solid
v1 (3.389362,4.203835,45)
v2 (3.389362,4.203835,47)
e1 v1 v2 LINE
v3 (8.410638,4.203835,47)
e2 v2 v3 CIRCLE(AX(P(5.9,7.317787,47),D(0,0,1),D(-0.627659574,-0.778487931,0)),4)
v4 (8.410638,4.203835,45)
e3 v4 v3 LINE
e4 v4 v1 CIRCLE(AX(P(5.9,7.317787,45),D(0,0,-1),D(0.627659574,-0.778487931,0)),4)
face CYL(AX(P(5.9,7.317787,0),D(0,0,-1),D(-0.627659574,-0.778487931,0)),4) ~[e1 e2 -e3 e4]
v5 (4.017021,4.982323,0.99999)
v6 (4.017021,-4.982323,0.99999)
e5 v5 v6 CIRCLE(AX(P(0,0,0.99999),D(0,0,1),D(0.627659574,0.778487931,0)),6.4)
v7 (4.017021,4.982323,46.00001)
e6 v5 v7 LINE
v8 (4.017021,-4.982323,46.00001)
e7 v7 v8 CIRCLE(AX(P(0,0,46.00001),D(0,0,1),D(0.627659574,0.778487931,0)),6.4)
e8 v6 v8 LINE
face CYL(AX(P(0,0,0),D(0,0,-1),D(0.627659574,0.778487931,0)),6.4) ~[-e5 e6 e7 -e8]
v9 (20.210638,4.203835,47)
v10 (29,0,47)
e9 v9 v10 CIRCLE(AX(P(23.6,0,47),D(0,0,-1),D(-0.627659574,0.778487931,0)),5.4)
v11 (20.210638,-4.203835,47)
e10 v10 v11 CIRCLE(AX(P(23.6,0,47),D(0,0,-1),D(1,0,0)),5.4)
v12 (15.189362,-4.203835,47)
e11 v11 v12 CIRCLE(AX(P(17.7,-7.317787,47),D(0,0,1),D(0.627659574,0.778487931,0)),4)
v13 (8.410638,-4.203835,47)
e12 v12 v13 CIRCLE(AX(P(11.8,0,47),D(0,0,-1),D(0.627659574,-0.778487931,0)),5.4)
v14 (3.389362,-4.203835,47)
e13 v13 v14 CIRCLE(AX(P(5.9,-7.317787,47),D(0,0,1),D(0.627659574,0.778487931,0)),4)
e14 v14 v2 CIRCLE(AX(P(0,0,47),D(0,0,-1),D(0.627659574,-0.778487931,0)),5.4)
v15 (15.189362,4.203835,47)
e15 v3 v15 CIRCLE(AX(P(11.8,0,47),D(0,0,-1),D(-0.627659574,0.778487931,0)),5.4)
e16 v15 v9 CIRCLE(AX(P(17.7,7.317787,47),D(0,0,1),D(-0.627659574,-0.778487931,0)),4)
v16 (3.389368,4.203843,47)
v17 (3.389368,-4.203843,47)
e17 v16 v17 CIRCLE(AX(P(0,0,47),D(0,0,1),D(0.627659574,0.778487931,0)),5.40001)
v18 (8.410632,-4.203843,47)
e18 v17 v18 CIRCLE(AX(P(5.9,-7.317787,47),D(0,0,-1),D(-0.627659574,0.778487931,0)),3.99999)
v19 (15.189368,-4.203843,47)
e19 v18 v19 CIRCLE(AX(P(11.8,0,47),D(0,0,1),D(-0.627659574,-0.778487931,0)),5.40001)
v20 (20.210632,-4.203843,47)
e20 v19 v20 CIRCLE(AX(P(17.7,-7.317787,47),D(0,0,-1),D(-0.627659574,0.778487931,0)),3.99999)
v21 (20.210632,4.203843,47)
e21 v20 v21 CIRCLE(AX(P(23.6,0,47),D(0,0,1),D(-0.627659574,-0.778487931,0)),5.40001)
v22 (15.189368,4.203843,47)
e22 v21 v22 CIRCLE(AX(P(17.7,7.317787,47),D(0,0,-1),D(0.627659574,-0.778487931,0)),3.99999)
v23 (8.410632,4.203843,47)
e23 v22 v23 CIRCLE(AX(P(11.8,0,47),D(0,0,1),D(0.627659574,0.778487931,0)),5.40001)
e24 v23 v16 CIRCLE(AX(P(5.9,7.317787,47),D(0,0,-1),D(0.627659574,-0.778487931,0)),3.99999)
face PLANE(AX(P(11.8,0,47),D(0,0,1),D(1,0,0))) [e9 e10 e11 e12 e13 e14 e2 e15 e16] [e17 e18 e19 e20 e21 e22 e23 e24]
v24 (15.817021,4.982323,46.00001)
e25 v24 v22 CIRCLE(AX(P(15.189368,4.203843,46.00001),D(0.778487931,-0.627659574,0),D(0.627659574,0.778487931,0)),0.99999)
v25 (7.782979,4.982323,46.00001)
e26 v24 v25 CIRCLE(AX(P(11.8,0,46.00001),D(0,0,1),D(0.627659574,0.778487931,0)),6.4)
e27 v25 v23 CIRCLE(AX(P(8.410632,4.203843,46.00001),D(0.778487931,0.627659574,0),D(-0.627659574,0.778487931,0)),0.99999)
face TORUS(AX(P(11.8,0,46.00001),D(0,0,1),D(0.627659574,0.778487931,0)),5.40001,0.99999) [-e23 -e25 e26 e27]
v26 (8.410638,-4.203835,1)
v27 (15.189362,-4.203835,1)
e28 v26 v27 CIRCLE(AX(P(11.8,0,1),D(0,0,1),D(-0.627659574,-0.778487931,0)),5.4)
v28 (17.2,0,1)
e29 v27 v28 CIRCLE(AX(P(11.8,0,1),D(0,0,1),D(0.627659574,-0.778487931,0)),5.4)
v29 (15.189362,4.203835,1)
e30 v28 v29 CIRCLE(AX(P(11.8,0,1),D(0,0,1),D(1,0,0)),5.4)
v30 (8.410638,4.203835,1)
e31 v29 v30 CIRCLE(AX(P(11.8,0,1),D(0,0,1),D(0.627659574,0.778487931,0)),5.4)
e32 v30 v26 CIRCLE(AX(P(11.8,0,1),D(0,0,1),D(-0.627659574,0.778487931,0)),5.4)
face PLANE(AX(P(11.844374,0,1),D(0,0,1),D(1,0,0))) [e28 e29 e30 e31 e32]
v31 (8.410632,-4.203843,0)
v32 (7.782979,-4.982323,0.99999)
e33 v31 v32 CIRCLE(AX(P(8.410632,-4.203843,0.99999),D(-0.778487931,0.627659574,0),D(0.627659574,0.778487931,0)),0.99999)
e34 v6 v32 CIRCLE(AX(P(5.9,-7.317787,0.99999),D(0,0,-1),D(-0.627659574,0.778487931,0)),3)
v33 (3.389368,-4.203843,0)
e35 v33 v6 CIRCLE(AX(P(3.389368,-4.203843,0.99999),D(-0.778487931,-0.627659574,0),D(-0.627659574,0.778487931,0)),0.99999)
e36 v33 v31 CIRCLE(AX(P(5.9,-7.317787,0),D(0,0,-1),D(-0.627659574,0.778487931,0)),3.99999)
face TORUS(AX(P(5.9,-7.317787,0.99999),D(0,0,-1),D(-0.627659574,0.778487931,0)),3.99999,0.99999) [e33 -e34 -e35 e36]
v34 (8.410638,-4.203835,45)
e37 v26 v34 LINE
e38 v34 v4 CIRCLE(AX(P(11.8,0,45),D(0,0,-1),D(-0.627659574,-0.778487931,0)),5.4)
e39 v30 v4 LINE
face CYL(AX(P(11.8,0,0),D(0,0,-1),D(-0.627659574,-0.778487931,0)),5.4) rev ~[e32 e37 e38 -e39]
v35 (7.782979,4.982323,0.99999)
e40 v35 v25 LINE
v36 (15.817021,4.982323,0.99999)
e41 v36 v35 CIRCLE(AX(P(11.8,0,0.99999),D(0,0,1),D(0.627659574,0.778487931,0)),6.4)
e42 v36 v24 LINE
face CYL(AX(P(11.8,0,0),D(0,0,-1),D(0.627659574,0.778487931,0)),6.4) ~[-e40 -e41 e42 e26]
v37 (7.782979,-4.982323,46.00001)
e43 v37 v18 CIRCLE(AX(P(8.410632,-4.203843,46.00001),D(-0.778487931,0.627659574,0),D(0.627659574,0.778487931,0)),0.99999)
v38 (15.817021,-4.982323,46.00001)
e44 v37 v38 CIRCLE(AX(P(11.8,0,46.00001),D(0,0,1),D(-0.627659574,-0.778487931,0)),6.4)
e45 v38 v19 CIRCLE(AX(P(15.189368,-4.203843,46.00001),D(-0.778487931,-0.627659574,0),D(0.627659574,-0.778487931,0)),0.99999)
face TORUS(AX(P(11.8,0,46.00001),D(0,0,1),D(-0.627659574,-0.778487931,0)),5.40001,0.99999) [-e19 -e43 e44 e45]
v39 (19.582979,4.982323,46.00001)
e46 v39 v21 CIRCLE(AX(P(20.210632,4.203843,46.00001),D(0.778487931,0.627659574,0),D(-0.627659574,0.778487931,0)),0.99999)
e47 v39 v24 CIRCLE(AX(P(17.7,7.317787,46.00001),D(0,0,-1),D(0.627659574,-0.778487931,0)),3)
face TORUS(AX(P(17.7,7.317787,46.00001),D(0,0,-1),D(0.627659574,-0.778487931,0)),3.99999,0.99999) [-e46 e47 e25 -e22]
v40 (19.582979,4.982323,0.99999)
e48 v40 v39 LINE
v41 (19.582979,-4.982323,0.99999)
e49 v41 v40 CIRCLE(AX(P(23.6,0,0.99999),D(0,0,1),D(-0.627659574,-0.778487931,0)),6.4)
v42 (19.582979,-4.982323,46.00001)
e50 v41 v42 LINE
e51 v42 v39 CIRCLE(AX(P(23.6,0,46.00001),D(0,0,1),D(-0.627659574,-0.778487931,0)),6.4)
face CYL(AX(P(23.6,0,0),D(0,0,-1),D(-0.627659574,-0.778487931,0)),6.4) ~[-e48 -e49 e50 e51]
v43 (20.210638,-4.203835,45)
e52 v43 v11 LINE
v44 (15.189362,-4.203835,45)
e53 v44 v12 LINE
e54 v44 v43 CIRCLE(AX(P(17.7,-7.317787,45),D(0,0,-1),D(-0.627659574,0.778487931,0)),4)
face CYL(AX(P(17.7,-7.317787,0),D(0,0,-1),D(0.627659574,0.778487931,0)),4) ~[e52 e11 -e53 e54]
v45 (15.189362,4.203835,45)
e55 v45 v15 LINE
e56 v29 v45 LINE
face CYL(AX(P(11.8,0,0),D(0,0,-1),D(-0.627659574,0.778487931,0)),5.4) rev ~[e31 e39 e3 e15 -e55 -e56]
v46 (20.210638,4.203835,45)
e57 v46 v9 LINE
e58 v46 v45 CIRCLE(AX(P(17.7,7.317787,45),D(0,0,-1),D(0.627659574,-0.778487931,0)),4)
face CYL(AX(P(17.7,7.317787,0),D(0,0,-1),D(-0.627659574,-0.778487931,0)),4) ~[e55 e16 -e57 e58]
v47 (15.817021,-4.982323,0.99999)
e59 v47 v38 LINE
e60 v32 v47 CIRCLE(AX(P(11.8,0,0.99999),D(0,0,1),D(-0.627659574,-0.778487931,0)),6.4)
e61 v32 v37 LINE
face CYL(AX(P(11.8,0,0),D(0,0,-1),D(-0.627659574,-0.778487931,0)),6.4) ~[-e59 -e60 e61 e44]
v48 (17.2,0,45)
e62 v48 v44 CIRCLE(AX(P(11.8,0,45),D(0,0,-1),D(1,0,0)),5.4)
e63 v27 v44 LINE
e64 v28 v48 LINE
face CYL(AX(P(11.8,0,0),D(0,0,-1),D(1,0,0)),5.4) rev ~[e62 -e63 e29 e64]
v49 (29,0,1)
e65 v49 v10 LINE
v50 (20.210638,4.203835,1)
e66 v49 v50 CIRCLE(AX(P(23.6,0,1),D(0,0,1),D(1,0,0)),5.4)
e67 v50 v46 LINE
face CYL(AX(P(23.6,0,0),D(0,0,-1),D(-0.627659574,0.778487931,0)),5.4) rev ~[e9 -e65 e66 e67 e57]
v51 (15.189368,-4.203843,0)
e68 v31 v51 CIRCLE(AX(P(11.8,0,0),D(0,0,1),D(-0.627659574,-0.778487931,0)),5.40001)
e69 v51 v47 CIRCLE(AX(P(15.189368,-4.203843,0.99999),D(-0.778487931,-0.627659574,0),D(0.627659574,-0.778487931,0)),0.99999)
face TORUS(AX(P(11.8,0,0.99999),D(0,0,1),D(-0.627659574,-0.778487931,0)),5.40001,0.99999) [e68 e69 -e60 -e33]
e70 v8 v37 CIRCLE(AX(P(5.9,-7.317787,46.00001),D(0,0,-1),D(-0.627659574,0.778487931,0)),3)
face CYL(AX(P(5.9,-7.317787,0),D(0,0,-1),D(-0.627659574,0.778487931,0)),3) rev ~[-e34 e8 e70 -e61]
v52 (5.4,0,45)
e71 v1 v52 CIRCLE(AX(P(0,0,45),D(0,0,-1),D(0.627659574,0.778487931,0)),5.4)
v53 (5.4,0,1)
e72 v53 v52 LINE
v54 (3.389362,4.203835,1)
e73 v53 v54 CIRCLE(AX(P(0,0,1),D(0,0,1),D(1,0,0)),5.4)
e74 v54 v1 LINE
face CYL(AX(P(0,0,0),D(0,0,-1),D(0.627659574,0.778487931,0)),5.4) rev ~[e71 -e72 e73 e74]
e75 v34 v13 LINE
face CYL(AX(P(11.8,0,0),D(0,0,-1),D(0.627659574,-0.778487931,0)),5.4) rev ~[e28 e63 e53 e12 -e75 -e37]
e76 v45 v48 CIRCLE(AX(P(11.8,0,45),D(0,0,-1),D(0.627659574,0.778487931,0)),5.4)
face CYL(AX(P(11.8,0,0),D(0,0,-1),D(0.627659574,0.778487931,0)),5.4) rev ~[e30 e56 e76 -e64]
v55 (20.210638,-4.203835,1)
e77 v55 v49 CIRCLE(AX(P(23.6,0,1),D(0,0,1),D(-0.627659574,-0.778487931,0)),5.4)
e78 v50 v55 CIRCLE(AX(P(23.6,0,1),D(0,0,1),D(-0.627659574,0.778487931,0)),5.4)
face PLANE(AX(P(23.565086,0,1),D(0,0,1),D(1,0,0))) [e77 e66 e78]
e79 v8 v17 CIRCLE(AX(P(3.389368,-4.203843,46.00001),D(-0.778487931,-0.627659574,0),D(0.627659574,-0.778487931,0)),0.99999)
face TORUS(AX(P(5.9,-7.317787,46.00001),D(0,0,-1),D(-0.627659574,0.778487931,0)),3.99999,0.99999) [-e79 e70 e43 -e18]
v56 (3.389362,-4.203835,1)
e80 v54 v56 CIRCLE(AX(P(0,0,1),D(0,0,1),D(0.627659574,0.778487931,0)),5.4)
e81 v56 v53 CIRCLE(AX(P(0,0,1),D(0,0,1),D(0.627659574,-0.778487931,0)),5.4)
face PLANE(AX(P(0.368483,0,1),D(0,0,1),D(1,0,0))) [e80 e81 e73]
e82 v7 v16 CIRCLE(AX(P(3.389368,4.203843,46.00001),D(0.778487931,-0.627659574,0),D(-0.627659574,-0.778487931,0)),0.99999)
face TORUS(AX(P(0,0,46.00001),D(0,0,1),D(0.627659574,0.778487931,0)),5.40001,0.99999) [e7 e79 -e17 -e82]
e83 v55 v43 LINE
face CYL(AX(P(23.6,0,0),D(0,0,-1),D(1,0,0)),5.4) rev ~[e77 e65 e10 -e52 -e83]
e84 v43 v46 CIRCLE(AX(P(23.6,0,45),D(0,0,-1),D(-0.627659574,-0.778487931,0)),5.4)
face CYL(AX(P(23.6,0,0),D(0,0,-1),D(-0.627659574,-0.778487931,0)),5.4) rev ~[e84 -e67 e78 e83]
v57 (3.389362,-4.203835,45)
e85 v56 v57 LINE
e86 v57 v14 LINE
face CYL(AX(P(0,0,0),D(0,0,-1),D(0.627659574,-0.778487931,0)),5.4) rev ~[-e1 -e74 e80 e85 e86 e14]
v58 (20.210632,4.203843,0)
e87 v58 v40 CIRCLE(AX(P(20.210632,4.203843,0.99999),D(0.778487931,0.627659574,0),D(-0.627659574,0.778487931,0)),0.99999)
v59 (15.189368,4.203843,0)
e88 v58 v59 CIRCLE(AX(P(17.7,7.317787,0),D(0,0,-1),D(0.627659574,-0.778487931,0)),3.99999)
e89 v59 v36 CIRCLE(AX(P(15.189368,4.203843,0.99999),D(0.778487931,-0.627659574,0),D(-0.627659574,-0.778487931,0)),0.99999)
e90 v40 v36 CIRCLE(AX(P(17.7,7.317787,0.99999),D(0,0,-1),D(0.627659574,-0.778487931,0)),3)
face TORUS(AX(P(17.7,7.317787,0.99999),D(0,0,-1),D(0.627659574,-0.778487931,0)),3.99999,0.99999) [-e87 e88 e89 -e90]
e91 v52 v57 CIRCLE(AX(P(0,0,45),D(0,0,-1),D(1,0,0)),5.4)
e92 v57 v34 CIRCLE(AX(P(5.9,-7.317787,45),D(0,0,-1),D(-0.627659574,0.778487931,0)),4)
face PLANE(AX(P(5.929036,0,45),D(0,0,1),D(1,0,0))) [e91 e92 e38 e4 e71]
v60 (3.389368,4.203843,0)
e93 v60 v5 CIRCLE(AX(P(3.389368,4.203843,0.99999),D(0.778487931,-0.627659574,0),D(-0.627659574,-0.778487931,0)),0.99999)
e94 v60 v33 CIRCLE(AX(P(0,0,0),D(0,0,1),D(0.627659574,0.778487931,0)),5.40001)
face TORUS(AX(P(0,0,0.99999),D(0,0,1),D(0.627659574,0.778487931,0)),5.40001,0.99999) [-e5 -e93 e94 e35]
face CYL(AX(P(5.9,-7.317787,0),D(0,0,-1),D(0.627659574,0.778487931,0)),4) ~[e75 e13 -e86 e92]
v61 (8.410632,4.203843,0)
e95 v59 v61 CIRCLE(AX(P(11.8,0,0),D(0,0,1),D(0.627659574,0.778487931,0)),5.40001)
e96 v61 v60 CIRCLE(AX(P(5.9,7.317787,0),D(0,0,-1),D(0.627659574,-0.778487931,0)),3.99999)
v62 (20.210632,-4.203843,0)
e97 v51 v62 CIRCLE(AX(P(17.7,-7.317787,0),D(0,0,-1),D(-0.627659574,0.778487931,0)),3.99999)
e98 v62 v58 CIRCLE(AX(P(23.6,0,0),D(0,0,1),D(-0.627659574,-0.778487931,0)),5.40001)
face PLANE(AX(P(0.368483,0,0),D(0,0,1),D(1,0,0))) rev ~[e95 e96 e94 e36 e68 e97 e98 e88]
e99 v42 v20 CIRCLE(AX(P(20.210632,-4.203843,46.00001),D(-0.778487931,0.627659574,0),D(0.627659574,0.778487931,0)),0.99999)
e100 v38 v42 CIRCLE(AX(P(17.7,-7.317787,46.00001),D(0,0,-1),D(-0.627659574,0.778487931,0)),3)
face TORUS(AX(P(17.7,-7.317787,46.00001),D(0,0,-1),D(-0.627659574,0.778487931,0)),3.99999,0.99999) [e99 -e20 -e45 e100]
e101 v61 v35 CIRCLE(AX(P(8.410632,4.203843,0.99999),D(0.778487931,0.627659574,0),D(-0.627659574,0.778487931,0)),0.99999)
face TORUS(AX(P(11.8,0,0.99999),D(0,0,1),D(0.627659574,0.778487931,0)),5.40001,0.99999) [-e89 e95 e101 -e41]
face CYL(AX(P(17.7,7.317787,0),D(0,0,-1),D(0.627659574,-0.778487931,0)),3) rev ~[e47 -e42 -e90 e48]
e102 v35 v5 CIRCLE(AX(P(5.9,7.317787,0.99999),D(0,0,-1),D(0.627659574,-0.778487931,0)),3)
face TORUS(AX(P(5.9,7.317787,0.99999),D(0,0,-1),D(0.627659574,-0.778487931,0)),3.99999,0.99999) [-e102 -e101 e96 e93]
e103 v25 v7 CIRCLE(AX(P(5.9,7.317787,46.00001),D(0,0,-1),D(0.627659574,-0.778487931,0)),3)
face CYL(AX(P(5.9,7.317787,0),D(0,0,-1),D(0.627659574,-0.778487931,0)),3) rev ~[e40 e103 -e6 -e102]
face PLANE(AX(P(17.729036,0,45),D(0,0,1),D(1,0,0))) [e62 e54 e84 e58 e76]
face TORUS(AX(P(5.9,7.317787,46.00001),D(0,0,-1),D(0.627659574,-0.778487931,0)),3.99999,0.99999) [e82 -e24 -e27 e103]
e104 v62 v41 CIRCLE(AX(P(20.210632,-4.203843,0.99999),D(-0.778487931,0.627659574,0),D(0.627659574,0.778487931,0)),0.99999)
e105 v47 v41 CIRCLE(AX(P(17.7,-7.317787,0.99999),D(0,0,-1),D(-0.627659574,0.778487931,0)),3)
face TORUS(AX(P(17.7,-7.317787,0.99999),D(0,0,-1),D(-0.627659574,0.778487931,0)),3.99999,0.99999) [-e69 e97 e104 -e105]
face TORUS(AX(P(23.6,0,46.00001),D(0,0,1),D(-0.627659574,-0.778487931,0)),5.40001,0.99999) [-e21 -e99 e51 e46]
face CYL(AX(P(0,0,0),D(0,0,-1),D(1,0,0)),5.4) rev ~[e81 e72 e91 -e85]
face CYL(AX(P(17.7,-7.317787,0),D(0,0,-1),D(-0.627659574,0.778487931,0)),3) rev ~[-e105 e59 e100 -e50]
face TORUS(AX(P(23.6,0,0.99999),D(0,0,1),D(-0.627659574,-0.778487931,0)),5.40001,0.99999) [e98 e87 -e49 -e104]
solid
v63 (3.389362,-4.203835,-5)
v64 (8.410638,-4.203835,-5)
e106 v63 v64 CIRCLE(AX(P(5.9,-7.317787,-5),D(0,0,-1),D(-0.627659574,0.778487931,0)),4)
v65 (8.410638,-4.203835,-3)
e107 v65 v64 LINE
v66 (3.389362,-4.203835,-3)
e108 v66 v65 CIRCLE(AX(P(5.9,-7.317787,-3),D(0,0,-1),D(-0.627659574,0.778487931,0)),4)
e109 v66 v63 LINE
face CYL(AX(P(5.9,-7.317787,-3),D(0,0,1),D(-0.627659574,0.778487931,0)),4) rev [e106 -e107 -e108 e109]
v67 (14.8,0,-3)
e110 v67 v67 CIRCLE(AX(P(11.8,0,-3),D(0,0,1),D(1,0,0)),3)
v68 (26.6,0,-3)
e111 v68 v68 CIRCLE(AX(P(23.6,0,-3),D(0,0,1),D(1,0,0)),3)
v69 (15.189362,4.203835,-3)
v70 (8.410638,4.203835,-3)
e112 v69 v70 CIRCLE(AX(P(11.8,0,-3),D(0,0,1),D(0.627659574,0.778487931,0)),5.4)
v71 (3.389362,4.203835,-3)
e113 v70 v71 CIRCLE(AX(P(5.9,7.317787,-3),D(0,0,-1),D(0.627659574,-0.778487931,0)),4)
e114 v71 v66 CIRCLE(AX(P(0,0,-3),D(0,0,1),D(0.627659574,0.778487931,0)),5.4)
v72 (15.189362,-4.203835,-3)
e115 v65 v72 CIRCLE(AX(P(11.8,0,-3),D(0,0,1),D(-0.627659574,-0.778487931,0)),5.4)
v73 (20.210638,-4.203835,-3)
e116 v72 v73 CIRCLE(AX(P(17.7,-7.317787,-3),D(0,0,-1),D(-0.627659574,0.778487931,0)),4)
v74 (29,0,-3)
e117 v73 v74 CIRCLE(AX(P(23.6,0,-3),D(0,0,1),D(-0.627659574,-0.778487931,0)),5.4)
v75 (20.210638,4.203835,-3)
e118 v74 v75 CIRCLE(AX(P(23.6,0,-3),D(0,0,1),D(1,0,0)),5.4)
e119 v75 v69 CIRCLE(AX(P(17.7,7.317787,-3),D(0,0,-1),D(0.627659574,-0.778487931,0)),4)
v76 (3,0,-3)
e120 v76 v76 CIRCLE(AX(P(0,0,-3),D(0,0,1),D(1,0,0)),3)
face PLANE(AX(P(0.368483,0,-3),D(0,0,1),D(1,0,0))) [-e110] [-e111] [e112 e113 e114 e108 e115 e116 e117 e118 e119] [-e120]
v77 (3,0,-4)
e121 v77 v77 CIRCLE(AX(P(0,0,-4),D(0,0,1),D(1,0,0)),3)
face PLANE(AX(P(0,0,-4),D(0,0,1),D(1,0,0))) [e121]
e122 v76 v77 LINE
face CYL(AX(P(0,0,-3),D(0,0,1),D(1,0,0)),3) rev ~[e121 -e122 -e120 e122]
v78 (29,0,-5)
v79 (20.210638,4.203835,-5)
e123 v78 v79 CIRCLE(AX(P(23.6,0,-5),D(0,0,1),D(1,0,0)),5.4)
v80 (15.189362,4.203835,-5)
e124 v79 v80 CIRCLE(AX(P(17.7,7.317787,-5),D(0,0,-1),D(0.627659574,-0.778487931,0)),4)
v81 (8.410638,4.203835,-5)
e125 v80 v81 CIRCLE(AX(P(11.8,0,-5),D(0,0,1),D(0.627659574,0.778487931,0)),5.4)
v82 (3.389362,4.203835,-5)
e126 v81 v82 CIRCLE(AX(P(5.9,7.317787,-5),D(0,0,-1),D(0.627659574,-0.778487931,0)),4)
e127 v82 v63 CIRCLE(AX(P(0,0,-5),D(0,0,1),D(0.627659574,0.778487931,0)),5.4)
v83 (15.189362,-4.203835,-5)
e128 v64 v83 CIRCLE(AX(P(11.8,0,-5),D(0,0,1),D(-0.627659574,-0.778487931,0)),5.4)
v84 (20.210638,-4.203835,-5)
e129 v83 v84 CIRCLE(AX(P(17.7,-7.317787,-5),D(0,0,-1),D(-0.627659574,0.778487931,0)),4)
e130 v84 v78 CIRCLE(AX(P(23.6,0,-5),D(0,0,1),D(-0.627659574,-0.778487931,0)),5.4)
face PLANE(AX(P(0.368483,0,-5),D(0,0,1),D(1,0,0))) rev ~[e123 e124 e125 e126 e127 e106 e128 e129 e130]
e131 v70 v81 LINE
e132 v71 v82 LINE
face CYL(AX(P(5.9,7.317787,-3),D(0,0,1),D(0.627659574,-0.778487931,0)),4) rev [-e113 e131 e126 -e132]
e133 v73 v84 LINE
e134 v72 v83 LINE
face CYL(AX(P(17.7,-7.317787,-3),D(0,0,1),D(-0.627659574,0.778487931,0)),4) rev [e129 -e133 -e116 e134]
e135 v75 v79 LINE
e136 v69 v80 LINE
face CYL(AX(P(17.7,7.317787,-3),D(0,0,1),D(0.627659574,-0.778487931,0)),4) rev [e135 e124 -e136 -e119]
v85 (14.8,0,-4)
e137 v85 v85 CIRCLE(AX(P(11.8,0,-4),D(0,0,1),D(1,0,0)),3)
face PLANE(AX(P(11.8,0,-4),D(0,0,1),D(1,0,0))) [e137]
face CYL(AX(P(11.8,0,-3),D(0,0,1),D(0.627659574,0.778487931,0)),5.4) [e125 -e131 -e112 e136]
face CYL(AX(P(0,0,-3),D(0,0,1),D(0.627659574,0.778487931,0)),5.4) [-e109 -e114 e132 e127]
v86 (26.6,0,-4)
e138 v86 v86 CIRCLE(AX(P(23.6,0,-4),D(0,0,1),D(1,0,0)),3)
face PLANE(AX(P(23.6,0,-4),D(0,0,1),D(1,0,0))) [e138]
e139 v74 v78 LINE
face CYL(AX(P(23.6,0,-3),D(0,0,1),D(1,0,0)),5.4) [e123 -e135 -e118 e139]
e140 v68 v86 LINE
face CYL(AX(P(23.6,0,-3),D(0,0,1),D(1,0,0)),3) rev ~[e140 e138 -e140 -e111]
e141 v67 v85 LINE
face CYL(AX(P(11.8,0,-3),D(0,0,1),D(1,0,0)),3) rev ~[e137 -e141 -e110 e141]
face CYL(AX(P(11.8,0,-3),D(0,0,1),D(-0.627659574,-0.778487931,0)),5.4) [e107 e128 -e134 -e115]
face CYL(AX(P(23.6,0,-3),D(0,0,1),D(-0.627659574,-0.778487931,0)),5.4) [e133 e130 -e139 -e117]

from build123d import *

# Parameters (mm, degrees)
F1_DEPTH = 47
F2_DEPTH = 45
F3_DEPTH = 1
F4_R     = 0.99999
F5_START = -3
F5_DEPTH = 2
F6_R     = 3
F7_DEPTH = 1


# Not quite as in the source:
# - a fillet or chamfer is up to 0.001 mm smaller than in the source, because OpenCascade refuses the exact size


with BuildPart() as f1:
    # F0 (on Top) → F1 (new body)
    with BuildSketch(Plane.XY):
        with BuildLine():
            ThreePointArc((4.0170212766, -4.9823227578), (5.9, -4.3177865506), (7.7829787234, -4.9823227578))
            ThreePointArc((7.7829787234, -4.9823227578), (11.8, -6.4), (15.8170212766, -4.9823227578))
            ThreePointArc((15.8170212766, -4.9823227578), (17.7, -4.3177865506), (19.5829787234, -4.9823227578))
            ThreePointArc((19.5829787234, -4.9823227578), (30, 0), (19.5829787234, 4.9823227578))
            ThreePointArc((19.5829787234, 4.9823227578), (17.7, 4.3177865506), (15.8170212766, 4.9823227578))
            ThreePointArc((15.8170212766, 4.9823227578), (11.8, 6.4), (7.7829787234, 4.9823227578))
            ThreePointArc((7.7829787234, 4.9823227578), (5.9, 4.3177865506), (4.0170212766, 4.9823227578))
            ThreePointArc((4.0170212766, 4.9823227578), (-6.4, 0), (4.0170212766, -4.9823227578))
        make_face()
        with BuildLine():
            ThreePointArc((3.3893617021, -4.2038348269), (-5.4, 0), (3.3893617021, 4.2038348269))
            ThreePointArc((3.3893617021, 4.2038348269), (5.9, 3.3177865506), (8.4106382979, 4.2038348269))
            ThreePointArc((8.4106382979, 4.2038348269), (11.8, 5.4), (15.1893617021, 4.2038348269))
            ThreePointArc((15.1893617021, 4.2038348269), (17.7, 3.3177865506), (20.2106382979, 4.2038348269))
            ThreePointArc((20.2106382979, 4.2038348269), (25.9299621036, 4.8714758129), (29, 0))
            ThreePointArc((29, 0), (25.9299621036, -4.8714758129), (20.2106382979, -4.2038348269))
            ThreePointArc((20.2106382979, -4.2038348269), (17.7, -3.3177865506), (15.1893617021, -4.2038348269))
            ThreePointArc((15.1893617021, -4.2038348269), (11.8, -5.4), (8.4106382979, -4.2038348269))
            ThreePointArc((8.4106382979, -4.2038348269), (5.9, -3.3177865506), (3.3893617021, -4.2038348269))
        make_face(mode=Mode.SUBTRACT)
    extrude(amount=F1_DEPTH)

    # F0 (on Top) → F2 (join)
    with BuildSketch(Plane.XY):
        with BuildLine():
            ThreePointArc((3.3893617021, 4.2038348269), (4.8714758129, 2.3299621036), (5.4, 0))
            ThreePointArc((5.4, 0), (4.8714758129, -2.3299621036), (3.3893617021, -4.2038348269))
            ThreePointArc((3.3893617021, -4.2038348269), (5.9, -3.3177865506), (8.4106382979, -4.2038348269))
            ThreePointArc((8.4106382979, -4.2038348269), (6.4, 0), (8.4106382979, 4.2038348269))
            ThreePointArc((8.4106382979, 4.2038348269), (5.9, 3.3177865506), (3.3893617021, 4.2038348269))
        make_face()
        with BuildLine():
            ThreePointArc((20.2106382979, 4.2038348269), (17.7, 3.3177865506), (15.1893617021, 4.2038348269))
            ThreePointArc((15.1893617021, 4.2038348269), (16.6714758129, 2.3299621036), (17.2, 0))
            ThreePointArc((17.2, 0), (16.6714758129, -2.3299621036), (15.1893617021, -4.2038348269))
            ThreePointArc((15.1893617021, -4.2038348269), (17.7, -3.3177865506), (20.2106382979, -4.2038348269))
            ThreePointArc((20.2106382979, -4.2038348269), (18.2, 0), (20.2106382979, 4.2038348269))
        make_face()
    extrude(amount=F2_DEPTH)

    # F0 (on Top) → F3 (join)
    with BuildSketch(Plane.XY):
        with BuildLine():
            ThreePointArc((3.3893617021, -4.2038348269), (4.8714758129, -2.3299621036), (5.4, 0))
            ThreePointArc((5.4, 0), (4.8714758129, 2.3299621036), (3.3893617021, 4.2038348269))
            ThreePointArc((3.3893617021, 4.2038348269), (-5.4, 0), (3.3893617021, -4.2038348269))
        make_face()
        with BuildLine():
            ThreePointArc((15.1893617021, 4.2038348269), (11.8, 5.4), (8.4106382979, 4.2038348269))
            ThreePointArc((8.4106382979, 4.2038348269), (6.4, 0), (8.4106382979, -4.2038348269))
            ThreePointArc((8.4106382979, -4.2038348269), (11.8, -5.4), (15.1893617021, -4.2038348269))
            ThreePointArc((15.1893617021, -4.2038348269), (16.6714758129, -2.3299621036), (17.2, 0))
            ThreePointArc((17.2, 0), (16.6714758129, 2.3299621036), (15.1893617021, 4.2038348269))
        make_face()
        with BuildLine():
            ThreePointArc((29, 0), (25.9299621036, 4.8714758129), (20.2106382979, 4.2038348269))
            ThreePointArc((20.2106382979, 4.2038348269), (18.2, 0), (20.2106382979, -4.2038348269))
            ThreePointArc((20.2106382979, -4.2038348269), (25.9299621036, -4.8714758129), (29, 0))
        make_face()
    extrude(amount=F3_DEPTH)

    # F4 (radius 1 in the source; OpenCascade refuses exactly that, so slightly less here)
    f4_edges = [f1.edges().sort_by_distance(p)[0] for p in [
        (11.8, 6.4, 47),
        (5.9, 4.317787, 47),
        (-6.4, 0, 47),
        (5.9, -4.317787, 47),
        (11.8, -6.4, 47),
        (17.7, -4.317787, 47),
        (30, 0, 47),
        (17.7, 4.317787, 47),
        (5.9, -4.317787, 0),
        (11.8, -6.4, 0),
        (17.7, -4.317787, 0),
        (30, 0, 0),
        (17.7, 4.317787, 0),
        (11.8, 6.4, 0),
        (5.9, 4.317787, 0),
        (-6.4, 0, 0),
    ]]
    fillet(f4_edges, radius=F4_R)


with BuildPart() as f5:
    # F0 (on Top) → F5 (new body)
    with BuildSketch(Plane.XY.offset(F5_START)):
        with BuildLine():
            ThreePointArc((3.3893617021, -4.2038348269), (4.8714758129, -2.3299621036), (5.4, 0))
            ThreePointArc((5.4, 0), (4.8714758129, 2.3299621036), (3.3893617021, 4.2038348269))
            ThreePointArc((3.3893617021, 4.2038348269), (-5.4, 0), (3.3893617021, -4.2038348269))
        make_face()
        with BuildLine():
            ThreePointArc((3.3893617021, 4.2038348269), (4.8714758129, 2.3299621036), (5.4, 0))
            ThreePointArc((5.4, 0), (4.8714758129, -2.3299621036), (3.3893617021, -4.2038348269))
            ThreePointArc((3.3893617021, -4.2038348269), (5.9, -3.3177865506), (8.4106382979, -4.2038348269))
            ThreePointArc((8.4106382979, -4.2038348269), (6.4, 0), (8.4106382979, 4.2038348269))
            ThreePointArc((8.4106382979, 4.2038348269), (5.9, 3.3177865506), (3.3893617021, 4.2038348269))
        make_face()
        with BuildLine():
            ThreePointArc((15.1893617021, 4.2038348269), (11.8, 5.4), (8.4106382979, 4.2038348269))
            ThreePointArc((8.4106382979, 4.2038348269), (6.4, 0), (8.4106382979, -4.2038348269))
            ThreePointArc((8.4106382979, -4.2038348269), (11.8, -5.4), (15.1893617021, -4.2038348269))
            ThreePointArc((15.1893617021, -4.2038348269), (16.6714758129, -2.3299621036), (17.2, 0))
            ThreePointArc((17.2, 0), (16.6714758129, 2.3299621036), (15.1893617021, 4.2038348269))
        make_face()
        with BuildLine():
            ThreePointArc((20.2106382979, 4.2038348269), (17.7, 3.3177865506), (15.1893617021, 4.2038348269))
            ThreePointArc((15.1893617021, 4.2038348269), (16.6714758129, 2.3299621036), (17.2, 0))
            ThreePointArc((17.2, 0), (16.6714758129, -2.3299621036), (15.1893617021, -4.2038348269))
            ThreePointArc((15.1893617021, -4.2038348269), (17.7, -3.3177865506), (20.2106382979, -4.2038348269))
            ThreePointArc((20.2106382979, -4.2038348269), (18.2, 0), (20.2106382979, 4.2038348269))
        make_face()
        with BuildLine():
            ThreePointArc((29, 0), (25.9299621036, 4.8714758129), (20.2106382979, 4.2038348269))
            ThreePointArc((20.2106382979, 4.2038348269), (18.2, 0), (20.2106382979, -4.2038348269))
            ThreePointArc((20.2106382979, -4.2038348269), (25.9299621036, -4.8714758129), (29, 0))
        make_face()
    extrude(amount=-F5_DEPTH)

    # F6 (on face) → F7 (cut)
    with BuildSketch(Plane.XY.offset(-3)):
        Circle(F6_R)
        with Locations((11.8, 0)):
            Circle(F6_R)
        with Locations((23.6, 0)):
            Circle(F6_R)
    extrude(amount=-F7_DEPTH, mode=Mode.SUBTRACT)


solid = Compound([f1.part, f5.part])
